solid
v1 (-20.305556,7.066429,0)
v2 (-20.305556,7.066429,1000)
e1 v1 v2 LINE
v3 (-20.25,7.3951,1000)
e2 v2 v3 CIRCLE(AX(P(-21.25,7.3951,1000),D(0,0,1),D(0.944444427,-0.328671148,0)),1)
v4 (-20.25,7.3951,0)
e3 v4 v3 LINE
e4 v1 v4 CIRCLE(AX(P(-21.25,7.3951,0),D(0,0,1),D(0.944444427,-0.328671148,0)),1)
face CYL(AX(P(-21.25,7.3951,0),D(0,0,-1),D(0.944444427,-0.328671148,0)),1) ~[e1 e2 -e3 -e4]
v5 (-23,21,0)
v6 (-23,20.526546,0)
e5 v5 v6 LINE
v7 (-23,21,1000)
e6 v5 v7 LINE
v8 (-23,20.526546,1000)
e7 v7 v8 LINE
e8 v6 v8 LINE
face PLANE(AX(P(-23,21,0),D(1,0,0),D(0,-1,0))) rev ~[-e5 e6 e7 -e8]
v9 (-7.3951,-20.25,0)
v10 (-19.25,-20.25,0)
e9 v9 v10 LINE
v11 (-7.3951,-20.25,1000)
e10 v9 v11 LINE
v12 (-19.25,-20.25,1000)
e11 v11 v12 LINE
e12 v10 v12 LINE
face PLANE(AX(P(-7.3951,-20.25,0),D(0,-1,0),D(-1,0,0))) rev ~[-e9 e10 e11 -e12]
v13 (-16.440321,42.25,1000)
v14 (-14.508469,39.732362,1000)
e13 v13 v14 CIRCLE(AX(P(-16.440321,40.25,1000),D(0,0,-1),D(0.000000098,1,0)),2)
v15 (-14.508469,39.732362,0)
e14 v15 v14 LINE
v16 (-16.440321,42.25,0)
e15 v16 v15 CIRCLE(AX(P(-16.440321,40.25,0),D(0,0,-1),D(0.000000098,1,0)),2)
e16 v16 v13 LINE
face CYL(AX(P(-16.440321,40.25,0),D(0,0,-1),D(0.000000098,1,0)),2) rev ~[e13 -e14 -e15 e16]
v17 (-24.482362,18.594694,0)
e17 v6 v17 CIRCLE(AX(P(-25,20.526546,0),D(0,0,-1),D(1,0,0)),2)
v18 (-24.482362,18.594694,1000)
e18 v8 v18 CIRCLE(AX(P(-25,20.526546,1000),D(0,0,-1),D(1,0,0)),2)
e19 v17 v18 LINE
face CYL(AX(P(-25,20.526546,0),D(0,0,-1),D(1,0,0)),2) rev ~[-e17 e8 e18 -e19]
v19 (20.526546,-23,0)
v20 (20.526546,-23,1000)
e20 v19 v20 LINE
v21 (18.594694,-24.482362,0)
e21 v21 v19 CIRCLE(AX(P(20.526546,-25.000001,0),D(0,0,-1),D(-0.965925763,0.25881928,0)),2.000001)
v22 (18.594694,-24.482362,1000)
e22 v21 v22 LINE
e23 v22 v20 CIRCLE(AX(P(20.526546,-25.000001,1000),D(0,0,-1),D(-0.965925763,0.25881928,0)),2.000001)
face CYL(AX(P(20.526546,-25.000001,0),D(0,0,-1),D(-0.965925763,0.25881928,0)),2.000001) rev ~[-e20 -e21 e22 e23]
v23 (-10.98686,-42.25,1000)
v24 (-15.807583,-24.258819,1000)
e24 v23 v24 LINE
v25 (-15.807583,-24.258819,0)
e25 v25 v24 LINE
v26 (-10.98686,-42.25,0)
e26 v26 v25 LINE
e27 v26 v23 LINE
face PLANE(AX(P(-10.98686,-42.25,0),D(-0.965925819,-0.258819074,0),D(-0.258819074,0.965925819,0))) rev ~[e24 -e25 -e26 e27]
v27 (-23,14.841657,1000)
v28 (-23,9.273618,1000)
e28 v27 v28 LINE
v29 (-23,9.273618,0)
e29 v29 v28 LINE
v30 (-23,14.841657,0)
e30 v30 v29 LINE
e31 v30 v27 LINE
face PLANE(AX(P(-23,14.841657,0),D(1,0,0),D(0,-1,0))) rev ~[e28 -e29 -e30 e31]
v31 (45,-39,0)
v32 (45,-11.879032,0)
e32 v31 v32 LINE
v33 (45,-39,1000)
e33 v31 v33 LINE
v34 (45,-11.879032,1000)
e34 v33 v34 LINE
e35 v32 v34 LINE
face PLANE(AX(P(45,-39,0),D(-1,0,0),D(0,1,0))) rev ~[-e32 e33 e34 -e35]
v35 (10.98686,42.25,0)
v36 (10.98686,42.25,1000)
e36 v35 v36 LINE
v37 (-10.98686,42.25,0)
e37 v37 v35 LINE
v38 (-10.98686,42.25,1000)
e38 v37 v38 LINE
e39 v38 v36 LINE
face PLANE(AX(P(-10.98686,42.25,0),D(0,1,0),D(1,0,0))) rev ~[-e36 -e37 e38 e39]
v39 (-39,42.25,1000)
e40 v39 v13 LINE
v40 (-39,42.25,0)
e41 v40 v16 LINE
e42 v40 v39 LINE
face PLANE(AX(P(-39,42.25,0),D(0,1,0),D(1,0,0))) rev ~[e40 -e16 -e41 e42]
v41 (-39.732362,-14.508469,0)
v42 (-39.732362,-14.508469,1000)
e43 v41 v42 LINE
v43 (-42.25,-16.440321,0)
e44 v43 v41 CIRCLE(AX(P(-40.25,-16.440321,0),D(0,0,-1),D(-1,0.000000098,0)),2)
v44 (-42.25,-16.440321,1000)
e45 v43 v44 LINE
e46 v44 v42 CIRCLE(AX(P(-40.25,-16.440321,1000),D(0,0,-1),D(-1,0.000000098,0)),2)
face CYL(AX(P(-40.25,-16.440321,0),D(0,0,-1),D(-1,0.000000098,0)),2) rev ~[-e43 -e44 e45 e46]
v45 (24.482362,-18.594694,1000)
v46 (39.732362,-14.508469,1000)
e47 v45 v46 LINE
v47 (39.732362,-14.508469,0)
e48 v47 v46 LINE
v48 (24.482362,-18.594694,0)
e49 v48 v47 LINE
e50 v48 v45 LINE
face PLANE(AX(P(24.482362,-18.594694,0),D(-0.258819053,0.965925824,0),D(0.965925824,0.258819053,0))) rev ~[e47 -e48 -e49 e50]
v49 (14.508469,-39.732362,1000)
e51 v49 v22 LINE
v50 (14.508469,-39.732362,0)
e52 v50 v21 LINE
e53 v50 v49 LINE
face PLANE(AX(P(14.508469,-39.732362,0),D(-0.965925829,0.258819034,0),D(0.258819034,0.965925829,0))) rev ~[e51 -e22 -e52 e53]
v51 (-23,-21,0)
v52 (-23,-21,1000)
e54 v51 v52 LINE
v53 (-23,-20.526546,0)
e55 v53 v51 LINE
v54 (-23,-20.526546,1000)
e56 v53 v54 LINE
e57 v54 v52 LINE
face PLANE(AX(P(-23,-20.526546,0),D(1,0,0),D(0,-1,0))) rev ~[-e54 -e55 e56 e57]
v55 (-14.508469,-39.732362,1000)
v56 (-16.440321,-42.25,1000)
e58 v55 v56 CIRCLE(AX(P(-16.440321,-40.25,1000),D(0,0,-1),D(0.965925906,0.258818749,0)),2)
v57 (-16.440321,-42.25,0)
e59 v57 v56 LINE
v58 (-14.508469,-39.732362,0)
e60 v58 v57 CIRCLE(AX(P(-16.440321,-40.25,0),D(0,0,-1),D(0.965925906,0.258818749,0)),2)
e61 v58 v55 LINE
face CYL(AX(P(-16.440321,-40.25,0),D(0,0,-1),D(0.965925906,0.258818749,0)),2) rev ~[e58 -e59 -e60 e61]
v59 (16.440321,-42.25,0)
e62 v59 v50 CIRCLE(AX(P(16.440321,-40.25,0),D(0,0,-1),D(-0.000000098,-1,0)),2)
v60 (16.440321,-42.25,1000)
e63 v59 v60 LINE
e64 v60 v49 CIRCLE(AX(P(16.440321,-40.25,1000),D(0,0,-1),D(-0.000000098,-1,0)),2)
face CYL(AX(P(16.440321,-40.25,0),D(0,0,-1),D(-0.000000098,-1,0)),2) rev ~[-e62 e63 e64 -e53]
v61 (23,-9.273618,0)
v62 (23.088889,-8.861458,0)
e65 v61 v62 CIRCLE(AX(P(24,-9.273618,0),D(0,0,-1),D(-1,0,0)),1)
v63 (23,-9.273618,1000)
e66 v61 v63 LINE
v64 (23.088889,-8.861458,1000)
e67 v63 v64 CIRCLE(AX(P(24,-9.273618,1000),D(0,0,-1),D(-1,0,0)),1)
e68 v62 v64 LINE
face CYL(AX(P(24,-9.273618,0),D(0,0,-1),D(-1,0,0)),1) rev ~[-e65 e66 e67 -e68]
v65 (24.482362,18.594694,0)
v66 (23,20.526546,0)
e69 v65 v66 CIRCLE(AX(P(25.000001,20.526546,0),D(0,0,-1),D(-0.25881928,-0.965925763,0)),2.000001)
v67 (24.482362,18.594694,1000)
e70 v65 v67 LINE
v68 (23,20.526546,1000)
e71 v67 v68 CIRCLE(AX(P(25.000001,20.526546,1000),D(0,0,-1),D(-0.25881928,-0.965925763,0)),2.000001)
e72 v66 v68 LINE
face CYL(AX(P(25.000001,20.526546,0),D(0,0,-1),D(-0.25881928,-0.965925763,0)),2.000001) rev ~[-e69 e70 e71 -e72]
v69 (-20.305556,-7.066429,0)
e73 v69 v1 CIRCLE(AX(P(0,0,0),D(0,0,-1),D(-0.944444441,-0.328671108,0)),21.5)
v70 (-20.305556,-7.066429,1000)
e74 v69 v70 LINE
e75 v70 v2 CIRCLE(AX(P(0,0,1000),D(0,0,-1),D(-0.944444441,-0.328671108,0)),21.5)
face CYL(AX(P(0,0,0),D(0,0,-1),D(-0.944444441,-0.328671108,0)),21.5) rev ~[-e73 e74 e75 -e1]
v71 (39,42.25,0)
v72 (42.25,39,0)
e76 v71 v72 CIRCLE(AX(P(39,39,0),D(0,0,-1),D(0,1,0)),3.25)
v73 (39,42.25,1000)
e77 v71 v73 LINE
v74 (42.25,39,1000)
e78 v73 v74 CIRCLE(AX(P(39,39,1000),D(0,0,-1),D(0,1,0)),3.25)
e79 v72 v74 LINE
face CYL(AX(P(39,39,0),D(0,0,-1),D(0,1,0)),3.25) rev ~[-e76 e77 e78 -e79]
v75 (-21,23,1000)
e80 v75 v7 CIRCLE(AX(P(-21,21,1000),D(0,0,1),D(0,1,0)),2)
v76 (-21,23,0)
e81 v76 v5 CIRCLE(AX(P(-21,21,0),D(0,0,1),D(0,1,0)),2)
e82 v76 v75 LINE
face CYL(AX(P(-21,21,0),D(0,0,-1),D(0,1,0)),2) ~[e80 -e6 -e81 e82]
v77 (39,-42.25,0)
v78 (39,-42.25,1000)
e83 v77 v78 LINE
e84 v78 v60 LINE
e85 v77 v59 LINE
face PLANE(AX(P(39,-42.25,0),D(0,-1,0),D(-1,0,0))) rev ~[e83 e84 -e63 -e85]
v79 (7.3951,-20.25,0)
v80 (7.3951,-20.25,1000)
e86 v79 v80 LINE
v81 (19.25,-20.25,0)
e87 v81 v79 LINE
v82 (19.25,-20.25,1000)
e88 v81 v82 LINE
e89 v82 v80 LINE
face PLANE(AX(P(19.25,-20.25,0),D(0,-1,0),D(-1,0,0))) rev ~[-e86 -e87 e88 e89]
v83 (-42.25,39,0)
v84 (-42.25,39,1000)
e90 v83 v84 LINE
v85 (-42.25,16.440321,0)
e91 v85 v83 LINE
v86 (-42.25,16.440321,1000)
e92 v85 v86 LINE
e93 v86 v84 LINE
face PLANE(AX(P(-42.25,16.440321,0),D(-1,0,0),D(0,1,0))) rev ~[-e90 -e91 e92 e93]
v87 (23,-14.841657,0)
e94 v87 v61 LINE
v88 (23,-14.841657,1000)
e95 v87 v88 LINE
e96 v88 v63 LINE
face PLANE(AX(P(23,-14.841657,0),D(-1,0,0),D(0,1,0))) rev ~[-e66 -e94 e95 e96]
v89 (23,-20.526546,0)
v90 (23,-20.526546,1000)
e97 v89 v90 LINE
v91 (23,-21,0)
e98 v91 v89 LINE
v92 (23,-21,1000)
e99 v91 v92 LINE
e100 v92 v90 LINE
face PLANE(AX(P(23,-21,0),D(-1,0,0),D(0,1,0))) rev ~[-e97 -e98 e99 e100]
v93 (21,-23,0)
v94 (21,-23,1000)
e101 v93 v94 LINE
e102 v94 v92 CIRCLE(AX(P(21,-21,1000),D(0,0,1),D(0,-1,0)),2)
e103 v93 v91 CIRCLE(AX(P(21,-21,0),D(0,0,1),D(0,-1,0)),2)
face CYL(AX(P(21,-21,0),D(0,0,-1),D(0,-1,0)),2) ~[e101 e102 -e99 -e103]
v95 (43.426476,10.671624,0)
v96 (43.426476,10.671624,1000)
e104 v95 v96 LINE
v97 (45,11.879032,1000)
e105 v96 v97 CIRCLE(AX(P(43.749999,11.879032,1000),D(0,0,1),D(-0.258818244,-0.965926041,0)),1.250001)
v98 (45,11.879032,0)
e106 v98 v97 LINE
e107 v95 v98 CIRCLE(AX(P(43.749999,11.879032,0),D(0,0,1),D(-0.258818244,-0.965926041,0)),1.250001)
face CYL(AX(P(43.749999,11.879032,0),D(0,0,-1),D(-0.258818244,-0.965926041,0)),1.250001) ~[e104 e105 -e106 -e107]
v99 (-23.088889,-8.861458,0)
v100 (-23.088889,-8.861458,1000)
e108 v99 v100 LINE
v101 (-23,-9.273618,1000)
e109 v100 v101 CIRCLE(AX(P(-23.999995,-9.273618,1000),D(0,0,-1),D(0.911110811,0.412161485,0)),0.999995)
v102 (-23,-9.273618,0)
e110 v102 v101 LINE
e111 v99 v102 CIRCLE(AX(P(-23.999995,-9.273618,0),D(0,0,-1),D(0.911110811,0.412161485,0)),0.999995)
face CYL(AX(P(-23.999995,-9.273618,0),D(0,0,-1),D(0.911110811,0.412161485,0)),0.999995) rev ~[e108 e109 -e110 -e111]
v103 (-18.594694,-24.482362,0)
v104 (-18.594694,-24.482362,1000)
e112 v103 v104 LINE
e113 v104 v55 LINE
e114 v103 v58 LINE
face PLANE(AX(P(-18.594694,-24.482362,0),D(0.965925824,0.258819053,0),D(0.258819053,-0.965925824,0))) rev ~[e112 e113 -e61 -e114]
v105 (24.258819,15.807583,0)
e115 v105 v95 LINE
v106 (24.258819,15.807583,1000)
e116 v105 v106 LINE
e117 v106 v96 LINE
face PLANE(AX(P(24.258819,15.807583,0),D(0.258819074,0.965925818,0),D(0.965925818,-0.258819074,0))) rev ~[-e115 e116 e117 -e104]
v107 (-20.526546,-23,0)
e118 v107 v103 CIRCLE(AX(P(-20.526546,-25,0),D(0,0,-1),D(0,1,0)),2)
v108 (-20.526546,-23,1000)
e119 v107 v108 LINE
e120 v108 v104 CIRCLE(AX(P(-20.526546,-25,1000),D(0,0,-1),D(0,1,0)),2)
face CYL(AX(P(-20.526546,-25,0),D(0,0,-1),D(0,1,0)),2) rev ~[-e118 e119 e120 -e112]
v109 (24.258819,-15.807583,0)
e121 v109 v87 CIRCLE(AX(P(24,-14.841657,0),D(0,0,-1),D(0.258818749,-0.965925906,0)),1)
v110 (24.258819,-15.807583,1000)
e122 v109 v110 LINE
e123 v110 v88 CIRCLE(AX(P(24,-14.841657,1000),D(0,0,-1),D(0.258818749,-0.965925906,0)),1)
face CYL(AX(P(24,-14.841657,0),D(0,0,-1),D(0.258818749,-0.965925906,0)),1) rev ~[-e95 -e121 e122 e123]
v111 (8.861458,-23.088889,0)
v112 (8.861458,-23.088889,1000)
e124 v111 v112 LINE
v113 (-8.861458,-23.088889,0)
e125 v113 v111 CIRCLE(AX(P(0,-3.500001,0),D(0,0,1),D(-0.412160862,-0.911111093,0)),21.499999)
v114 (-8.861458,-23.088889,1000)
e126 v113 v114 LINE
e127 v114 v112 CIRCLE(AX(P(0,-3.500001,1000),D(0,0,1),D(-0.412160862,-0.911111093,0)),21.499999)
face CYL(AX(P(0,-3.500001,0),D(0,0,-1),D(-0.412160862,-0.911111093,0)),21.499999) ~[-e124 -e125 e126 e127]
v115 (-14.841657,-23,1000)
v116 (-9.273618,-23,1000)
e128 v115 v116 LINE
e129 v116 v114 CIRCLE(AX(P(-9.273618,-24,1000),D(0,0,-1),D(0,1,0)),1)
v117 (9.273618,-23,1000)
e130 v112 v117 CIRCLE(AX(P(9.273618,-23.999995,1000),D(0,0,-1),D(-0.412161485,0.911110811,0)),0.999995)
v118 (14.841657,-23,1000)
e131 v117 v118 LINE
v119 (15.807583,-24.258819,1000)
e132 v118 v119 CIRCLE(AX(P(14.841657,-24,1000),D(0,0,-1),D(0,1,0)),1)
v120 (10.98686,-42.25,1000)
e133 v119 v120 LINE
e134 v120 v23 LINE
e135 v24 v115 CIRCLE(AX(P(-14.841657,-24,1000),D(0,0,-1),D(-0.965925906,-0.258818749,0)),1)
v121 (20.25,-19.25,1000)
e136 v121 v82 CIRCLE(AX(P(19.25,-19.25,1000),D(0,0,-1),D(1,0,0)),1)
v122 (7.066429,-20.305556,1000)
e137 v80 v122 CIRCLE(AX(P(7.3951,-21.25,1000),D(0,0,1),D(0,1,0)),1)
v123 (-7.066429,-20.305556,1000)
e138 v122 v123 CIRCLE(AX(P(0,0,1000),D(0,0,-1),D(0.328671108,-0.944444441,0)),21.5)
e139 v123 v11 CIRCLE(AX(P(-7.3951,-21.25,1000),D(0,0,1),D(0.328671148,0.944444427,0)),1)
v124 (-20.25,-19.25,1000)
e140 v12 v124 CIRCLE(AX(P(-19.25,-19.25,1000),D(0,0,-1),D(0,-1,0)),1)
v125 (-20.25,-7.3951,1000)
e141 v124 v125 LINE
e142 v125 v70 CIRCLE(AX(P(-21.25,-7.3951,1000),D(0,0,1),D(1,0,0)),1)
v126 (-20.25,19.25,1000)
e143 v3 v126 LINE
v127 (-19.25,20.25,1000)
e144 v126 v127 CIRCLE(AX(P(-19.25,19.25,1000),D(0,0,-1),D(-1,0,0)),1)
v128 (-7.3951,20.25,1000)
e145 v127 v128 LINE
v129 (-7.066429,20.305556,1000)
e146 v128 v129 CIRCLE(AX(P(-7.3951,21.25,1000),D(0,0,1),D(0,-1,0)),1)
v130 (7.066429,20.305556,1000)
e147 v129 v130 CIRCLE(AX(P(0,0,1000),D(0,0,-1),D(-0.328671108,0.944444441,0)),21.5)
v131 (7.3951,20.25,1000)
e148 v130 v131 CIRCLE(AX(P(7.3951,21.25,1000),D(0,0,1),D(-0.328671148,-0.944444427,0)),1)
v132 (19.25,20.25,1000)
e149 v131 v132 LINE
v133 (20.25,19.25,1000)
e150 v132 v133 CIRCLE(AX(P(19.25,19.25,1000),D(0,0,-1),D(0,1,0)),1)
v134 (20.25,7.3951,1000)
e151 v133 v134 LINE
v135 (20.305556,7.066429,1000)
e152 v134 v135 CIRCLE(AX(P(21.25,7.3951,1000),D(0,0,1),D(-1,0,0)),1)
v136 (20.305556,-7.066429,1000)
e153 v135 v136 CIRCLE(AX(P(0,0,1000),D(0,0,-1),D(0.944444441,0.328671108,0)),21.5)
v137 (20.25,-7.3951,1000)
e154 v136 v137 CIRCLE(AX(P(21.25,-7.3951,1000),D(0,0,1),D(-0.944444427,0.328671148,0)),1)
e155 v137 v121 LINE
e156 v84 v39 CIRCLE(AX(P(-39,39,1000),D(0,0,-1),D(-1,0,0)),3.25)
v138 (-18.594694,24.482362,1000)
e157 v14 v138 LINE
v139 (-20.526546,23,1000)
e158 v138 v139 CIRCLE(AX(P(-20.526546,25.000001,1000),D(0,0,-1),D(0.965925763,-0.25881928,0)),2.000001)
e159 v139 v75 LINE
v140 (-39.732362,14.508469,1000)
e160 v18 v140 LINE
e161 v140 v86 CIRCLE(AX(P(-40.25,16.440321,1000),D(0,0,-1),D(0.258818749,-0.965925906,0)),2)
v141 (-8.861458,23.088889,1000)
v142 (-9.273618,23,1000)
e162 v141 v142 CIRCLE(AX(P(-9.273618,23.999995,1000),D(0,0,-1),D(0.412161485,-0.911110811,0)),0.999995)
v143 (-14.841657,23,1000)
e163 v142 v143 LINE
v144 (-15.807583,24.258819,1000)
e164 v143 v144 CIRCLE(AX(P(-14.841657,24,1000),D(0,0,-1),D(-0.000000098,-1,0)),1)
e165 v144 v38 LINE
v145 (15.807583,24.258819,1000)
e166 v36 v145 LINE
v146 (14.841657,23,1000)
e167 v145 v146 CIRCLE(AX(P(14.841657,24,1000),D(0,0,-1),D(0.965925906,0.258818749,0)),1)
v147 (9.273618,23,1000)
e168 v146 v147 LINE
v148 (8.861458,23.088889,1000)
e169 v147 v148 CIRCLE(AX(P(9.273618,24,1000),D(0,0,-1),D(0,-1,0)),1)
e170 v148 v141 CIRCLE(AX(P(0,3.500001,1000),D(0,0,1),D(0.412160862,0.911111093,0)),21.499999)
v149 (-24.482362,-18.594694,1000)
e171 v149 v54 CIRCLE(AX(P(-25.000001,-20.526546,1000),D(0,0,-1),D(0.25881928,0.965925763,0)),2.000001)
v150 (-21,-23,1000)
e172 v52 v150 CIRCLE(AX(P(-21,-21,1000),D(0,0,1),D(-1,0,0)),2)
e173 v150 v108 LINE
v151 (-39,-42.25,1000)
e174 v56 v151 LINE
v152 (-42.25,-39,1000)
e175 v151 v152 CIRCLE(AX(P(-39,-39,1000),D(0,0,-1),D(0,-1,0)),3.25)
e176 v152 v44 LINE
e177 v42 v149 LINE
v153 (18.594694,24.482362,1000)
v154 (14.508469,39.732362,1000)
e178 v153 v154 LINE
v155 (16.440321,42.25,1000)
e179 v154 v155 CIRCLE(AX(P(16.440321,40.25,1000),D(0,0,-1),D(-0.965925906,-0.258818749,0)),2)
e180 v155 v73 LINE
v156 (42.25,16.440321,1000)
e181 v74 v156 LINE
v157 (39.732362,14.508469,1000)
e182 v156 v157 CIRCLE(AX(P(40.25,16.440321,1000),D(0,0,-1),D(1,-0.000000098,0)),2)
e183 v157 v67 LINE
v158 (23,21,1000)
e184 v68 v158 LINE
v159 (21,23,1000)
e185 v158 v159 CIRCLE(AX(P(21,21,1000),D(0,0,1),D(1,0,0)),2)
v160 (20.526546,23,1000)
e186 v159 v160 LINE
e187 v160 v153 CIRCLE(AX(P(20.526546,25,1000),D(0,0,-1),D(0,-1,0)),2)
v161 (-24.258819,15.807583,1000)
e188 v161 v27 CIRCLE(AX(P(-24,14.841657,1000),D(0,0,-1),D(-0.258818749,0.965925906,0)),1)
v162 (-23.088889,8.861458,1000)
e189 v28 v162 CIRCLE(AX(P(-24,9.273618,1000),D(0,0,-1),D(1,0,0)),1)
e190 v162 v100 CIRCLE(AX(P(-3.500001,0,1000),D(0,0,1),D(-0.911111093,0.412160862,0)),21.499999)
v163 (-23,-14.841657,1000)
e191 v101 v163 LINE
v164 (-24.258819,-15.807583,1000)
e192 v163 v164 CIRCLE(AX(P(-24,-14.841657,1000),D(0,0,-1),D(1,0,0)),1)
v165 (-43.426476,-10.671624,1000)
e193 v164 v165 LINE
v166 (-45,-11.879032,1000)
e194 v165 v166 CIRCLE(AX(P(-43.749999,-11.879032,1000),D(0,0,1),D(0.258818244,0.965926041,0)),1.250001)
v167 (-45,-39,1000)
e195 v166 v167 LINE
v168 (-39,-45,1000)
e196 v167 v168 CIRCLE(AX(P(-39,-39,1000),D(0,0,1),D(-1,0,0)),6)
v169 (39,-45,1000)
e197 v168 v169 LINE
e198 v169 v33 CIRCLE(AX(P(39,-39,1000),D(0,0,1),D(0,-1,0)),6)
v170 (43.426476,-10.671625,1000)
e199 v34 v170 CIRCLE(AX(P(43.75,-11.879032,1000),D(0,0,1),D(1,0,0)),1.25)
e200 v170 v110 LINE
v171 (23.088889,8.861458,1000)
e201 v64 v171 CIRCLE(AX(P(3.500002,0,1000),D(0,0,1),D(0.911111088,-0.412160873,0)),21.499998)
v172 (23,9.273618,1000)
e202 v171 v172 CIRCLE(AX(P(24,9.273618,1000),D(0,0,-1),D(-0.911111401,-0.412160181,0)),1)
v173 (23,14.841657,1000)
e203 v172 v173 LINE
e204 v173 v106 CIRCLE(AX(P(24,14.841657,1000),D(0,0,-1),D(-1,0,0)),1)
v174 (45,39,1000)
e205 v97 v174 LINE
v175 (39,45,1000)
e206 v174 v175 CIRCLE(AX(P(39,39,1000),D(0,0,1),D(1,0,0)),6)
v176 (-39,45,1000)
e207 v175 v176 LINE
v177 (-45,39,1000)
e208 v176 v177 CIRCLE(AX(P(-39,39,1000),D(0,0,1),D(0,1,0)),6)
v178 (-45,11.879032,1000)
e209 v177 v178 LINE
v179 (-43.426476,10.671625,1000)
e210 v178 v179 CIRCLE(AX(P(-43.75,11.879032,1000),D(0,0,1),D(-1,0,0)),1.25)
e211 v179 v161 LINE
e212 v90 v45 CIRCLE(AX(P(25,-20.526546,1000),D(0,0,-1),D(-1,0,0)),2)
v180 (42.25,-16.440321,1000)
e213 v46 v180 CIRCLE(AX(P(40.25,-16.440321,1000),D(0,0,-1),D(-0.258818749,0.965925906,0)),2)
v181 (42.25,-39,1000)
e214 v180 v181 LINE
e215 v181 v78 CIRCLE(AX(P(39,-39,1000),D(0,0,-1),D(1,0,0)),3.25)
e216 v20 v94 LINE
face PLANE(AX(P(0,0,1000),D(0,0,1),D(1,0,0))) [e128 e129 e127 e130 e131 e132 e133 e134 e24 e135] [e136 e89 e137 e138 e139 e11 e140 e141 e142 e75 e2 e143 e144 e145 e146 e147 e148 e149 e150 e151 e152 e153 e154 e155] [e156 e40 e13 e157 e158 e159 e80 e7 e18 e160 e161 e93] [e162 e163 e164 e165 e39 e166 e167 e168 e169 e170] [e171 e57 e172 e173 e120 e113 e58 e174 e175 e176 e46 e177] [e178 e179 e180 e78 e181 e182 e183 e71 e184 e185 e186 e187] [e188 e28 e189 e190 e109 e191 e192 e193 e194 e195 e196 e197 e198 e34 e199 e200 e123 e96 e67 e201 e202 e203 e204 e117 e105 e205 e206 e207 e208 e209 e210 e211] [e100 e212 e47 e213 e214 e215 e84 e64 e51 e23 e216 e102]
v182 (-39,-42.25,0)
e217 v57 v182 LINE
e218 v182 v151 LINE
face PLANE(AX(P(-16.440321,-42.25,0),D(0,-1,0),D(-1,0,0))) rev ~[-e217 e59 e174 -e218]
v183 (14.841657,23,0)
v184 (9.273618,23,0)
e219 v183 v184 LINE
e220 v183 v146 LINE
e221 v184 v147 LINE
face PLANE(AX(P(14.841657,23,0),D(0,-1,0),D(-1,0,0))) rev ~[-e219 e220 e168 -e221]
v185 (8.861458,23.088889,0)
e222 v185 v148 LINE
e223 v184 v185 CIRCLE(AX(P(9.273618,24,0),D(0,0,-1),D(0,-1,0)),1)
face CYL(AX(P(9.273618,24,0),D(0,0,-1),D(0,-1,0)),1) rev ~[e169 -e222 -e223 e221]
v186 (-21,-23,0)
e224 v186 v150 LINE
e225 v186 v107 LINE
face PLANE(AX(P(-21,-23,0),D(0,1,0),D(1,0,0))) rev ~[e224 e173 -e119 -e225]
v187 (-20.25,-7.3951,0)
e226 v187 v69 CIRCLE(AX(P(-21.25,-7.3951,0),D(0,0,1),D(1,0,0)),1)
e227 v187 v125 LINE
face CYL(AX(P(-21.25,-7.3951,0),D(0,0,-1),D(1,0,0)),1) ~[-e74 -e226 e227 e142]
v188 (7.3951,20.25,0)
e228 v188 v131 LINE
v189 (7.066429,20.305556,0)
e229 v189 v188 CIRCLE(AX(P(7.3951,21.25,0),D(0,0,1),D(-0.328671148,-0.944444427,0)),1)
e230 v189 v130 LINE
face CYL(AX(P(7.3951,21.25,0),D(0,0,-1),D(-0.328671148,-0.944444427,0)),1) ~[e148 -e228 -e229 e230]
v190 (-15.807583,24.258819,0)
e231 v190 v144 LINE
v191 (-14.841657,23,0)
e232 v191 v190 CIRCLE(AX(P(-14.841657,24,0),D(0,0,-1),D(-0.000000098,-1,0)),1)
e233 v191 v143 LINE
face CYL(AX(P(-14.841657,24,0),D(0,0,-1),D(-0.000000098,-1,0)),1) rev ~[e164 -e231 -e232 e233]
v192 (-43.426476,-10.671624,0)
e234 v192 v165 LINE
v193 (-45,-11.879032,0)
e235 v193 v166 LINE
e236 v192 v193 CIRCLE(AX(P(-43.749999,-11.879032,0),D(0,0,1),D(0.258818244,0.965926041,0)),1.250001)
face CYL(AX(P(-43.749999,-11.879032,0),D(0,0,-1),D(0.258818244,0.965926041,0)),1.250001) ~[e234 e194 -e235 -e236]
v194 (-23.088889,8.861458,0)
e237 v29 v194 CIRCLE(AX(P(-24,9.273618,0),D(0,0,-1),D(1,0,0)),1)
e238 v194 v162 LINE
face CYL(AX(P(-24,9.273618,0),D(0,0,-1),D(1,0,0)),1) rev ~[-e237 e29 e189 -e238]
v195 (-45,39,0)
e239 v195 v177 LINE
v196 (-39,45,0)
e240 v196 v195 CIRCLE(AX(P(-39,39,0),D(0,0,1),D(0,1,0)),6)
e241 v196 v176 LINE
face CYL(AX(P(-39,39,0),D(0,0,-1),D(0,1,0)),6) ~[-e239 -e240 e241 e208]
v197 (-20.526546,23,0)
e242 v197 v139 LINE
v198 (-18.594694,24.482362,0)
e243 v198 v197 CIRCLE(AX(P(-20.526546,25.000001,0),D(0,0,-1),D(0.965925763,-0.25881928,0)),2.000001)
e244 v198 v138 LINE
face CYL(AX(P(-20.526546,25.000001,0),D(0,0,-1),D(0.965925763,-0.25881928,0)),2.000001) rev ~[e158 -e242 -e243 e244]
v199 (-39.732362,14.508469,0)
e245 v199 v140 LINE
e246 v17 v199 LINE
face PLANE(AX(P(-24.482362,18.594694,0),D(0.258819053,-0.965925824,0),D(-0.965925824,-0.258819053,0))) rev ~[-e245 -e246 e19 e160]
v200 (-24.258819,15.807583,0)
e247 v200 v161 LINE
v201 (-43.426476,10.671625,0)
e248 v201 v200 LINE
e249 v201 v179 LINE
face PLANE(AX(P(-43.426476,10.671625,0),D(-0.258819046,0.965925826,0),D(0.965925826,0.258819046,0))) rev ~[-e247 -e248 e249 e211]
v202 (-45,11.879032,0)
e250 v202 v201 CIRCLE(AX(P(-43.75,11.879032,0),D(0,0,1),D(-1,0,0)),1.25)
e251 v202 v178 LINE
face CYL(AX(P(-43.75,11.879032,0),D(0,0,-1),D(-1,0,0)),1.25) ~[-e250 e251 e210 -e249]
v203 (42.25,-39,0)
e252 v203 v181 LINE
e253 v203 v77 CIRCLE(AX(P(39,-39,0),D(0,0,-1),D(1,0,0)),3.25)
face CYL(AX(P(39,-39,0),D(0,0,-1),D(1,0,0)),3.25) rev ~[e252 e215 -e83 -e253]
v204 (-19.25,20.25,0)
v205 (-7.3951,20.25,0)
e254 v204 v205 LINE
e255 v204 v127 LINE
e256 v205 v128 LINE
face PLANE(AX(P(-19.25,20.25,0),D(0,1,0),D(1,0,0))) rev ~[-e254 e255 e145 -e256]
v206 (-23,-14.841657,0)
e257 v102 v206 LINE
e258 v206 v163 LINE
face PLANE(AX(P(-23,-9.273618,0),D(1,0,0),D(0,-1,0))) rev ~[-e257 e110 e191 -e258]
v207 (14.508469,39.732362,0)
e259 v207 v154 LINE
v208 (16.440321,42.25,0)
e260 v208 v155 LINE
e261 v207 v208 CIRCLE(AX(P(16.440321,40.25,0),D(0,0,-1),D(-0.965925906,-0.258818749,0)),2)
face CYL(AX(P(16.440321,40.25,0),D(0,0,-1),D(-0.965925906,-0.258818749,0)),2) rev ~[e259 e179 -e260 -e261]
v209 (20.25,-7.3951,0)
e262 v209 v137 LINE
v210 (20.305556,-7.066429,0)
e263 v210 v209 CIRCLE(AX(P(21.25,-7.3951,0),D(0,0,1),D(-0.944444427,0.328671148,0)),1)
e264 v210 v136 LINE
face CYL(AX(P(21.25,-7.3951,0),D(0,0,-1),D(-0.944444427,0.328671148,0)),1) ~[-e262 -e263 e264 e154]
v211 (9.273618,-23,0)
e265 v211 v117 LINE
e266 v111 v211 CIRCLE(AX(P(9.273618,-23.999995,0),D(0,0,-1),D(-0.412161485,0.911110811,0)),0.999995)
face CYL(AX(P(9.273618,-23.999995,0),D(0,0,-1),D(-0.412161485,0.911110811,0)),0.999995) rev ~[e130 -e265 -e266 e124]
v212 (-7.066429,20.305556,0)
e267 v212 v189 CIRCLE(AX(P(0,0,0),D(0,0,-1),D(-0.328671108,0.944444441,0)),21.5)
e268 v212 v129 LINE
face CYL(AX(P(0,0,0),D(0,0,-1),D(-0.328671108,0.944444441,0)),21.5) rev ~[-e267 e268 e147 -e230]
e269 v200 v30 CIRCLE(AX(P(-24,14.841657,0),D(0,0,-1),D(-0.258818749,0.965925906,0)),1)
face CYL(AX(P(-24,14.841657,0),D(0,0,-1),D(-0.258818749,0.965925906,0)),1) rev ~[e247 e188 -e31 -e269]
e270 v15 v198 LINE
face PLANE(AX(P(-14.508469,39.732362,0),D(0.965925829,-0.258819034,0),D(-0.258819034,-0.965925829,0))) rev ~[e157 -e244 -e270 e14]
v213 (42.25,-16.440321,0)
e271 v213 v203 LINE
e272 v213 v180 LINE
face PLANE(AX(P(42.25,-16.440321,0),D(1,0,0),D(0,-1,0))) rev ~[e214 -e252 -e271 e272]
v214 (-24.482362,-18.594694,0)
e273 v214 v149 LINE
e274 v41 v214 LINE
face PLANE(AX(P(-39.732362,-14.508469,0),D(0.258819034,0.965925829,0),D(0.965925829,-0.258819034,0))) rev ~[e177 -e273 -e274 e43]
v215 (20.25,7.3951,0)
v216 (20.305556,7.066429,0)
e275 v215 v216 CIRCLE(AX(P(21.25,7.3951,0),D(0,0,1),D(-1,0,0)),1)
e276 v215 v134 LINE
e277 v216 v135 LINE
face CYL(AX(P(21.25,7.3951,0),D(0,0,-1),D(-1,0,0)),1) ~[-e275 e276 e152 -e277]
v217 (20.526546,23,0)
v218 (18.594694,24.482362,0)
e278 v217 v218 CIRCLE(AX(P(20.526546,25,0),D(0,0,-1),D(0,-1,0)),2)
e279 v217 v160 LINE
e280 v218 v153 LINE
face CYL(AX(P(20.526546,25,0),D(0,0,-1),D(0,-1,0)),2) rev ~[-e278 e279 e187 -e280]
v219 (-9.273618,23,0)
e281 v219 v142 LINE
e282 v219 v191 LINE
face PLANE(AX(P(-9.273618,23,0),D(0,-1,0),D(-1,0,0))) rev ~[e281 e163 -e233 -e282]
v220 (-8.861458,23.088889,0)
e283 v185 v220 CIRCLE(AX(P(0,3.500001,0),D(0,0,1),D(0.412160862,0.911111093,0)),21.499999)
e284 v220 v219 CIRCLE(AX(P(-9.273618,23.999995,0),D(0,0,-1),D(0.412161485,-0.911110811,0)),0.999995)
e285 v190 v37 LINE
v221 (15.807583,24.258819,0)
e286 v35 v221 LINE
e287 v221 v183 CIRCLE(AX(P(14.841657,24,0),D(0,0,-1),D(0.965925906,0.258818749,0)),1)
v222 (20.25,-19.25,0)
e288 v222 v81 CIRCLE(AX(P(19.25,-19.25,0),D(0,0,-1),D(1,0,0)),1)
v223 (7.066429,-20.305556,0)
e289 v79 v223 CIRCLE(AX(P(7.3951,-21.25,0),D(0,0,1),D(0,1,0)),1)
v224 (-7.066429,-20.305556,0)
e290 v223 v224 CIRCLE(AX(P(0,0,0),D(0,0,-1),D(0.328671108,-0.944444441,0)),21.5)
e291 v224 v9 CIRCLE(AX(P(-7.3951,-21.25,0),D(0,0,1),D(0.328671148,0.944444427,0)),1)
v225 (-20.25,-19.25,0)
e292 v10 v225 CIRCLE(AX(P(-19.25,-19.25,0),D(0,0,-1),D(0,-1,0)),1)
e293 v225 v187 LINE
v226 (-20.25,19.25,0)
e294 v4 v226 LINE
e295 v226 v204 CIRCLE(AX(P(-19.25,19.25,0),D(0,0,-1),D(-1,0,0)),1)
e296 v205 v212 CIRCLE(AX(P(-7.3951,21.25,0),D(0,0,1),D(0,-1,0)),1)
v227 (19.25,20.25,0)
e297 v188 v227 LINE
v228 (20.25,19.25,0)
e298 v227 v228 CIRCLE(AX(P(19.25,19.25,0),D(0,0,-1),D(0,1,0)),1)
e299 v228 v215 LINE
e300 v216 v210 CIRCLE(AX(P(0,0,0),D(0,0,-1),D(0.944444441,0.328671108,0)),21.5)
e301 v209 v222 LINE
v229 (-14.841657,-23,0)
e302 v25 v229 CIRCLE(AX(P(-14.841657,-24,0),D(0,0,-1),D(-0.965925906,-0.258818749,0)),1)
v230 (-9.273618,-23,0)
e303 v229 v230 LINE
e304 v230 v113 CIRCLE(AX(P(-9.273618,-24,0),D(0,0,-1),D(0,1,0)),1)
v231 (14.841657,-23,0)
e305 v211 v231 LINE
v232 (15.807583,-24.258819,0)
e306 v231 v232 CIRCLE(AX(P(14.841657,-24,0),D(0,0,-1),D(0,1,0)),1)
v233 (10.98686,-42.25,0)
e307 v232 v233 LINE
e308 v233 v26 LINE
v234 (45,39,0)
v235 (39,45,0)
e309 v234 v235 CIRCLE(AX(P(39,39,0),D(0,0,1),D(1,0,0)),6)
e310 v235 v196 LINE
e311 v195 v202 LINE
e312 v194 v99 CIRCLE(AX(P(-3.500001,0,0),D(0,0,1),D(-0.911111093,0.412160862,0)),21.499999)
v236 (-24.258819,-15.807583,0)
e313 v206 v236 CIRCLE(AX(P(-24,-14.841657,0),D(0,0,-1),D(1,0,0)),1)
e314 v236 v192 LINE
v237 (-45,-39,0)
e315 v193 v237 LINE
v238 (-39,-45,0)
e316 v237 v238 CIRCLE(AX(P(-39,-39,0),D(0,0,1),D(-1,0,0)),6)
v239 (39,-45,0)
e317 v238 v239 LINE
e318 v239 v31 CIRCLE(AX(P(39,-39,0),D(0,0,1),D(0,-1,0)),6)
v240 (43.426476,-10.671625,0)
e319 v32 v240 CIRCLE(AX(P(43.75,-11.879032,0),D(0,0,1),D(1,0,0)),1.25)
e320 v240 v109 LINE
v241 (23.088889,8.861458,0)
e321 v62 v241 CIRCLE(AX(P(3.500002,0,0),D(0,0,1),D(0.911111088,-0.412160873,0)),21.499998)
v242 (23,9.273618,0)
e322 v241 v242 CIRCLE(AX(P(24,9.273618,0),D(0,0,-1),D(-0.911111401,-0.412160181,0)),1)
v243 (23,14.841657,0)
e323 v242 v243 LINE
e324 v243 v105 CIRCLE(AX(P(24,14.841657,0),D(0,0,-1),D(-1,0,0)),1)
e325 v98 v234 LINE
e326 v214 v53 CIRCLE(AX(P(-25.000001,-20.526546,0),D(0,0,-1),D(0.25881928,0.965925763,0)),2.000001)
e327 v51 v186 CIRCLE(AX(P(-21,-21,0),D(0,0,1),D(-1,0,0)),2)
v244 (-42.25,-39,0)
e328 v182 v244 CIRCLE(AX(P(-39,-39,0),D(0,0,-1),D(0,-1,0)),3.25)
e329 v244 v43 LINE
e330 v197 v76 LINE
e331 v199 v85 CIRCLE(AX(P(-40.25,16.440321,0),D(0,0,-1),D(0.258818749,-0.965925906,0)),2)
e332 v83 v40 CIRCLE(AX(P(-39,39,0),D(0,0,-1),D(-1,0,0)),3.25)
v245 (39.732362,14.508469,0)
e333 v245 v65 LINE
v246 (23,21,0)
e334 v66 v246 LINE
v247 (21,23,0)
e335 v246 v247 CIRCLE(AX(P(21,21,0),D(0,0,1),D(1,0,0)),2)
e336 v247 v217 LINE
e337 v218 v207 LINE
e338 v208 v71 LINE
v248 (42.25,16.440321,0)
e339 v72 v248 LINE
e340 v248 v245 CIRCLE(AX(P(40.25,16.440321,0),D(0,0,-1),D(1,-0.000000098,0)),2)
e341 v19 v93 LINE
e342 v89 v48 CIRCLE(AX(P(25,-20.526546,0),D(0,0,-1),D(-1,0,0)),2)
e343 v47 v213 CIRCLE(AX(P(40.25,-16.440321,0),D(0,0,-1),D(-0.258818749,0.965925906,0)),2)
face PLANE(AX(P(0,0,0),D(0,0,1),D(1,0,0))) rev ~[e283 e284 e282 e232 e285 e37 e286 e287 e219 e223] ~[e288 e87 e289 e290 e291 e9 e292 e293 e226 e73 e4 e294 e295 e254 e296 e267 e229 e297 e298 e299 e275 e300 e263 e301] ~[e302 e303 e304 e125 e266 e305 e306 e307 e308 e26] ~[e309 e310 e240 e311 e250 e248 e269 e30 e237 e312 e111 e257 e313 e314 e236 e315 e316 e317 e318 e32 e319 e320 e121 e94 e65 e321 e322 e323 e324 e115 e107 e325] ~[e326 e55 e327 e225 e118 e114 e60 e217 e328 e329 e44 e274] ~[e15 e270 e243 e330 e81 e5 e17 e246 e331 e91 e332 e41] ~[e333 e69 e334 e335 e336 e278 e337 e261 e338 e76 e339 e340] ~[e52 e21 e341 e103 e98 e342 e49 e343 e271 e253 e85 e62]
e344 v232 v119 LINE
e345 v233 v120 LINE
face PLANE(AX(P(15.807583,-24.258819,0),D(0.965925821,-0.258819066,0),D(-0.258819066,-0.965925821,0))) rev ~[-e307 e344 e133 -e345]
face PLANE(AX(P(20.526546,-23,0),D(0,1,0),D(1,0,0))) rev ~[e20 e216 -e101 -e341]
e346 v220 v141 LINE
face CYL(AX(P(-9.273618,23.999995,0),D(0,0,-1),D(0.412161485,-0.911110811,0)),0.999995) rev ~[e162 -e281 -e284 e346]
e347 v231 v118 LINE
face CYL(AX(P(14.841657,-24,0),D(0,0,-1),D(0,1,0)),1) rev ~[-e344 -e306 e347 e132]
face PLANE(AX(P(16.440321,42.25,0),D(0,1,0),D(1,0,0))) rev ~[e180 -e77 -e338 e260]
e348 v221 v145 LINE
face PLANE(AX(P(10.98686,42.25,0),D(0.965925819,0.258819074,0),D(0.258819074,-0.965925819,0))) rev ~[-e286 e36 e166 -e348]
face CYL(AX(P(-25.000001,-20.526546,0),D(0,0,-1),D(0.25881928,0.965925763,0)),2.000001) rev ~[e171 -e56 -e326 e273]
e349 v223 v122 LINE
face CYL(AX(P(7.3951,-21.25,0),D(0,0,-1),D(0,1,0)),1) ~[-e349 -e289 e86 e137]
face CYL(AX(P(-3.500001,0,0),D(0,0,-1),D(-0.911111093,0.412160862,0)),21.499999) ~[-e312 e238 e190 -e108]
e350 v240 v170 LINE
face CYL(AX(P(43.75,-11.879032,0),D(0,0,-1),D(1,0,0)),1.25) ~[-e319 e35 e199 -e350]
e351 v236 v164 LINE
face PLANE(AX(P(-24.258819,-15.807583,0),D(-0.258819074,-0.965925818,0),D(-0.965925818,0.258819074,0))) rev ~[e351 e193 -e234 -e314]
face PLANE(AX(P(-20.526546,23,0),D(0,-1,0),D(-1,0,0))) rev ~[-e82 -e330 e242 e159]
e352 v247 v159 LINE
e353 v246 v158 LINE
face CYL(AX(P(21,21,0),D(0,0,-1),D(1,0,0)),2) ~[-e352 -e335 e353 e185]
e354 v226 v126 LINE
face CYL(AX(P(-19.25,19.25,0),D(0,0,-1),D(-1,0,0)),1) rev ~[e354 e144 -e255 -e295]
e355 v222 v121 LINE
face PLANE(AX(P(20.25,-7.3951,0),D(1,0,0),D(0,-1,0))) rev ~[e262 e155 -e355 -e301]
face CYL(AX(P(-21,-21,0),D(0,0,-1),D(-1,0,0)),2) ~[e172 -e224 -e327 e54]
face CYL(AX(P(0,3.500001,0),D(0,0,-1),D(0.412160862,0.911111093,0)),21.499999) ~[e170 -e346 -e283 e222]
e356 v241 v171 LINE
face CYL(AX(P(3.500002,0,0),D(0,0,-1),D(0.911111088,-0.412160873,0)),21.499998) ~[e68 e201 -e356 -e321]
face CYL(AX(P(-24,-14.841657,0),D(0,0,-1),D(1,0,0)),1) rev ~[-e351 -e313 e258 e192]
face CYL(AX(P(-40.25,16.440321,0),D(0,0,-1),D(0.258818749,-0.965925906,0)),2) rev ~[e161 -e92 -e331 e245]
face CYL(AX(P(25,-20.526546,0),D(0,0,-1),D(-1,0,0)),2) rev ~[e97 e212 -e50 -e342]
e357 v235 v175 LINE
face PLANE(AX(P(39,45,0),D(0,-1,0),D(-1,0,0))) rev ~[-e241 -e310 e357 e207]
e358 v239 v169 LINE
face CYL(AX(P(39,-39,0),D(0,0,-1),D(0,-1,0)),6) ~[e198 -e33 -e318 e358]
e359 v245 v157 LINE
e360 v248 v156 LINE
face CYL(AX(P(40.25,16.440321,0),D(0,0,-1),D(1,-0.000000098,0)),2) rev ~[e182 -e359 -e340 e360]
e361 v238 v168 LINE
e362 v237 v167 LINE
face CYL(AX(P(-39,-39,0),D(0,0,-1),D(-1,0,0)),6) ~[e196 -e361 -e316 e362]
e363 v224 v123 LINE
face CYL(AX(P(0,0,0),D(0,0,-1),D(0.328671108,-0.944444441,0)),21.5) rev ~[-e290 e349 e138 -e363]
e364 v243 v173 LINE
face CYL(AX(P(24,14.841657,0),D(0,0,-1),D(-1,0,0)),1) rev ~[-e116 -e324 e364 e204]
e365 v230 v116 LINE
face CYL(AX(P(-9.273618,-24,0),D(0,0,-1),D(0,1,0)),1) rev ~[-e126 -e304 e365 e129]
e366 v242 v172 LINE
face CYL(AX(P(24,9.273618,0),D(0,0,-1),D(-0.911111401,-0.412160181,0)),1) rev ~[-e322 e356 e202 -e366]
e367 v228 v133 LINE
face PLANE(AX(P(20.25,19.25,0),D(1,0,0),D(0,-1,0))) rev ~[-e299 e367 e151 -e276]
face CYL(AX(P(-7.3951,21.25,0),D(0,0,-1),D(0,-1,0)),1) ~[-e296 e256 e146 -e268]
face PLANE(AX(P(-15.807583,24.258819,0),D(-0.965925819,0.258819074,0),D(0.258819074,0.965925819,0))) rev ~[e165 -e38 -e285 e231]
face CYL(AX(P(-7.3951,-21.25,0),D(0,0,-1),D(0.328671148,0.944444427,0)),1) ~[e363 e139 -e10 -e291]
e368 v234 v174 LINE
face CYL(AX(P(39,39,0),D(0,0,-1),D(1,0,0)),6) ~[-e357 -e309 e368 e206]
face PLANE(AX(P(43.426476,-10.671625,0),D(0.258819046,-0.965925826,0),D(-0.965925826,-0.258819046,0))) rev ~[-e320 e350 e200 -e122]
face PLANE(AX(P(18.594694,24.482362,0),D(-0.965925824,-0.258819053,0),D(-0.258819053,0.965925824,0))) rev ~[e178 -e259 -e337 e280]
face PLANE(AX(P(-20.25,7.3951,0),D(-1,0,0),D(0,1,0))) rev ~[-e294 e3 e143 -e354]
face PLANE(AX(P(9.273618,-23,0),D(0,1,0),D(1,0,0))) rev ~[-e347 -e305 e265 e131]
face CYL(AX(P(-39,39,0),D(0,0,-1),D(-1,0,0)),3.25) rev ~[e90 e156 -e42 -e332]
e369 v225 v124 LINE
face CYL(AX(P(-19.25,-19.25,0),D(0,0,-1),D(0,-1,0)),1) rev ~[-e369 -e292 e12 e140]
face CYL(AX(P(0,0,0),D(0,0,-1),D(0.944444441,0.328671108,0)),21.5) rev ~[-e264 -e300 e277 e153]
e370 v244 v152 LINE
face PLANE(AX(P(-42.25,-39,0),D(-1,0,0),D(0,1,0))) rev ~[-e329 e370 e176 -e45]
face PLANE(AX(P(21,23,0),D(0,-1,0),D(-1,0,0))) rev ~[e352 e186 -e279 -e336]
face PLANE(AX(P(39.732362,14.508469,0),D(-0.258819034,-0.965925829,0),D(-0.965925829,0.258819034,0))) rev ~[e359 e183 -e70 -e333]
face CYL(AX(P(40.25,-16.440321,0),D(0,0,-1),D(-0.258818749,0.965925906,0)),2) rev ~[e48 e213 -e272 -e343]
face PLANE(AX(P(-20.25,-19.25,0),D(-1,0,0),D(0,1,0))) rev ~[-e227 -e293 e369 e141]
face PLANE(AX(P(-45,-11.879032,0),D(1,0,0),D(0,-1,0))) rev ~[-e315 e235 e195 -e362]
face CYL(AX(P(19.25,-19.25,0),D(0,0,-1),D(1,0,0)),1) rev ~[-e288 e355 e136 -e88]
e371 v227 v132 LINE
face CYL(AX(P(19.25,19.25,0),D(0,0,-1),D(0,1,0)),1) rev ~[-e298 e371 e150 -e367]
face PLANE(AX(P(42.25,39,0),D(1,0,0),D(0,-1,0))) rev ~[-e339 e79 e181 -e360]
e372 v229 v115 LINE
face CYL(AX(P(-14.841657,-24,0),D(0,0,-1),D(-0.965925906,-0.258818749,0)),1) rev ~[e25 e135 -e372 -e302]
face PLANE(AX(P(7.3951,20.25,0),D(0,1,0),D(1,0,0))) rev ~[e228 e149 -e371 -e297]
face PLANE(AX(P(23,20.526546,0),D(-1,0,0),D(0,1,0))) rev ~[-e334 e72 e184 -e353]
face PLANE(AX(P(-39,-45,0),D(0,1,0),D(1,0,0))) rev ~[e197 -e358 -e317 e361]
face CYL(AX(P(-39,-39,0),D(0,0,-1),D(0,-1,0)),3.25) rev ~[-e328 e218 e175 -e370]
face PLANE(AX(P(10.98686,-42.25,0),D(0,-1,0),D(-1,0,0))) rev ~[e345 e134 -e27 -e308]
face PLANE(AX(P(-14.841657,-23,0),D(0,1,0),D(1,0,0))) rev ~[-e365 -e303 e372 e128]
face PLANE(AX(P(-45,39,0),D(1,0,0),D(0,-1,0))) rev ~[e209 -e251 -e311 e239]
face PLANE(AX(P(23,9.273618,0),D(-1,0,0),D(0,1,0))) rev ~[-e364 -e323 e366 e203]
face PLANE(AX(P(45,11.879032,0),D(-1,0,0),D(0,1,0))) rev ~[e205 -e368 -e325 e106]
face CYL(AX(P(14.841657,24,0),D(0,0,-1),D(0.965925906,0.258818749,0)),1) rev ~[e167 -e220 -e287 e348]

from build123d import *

# Parameters (mm, degrees)
F1_DEPTH = 1000


# Not quite as in the source:
# - ends of sketch curves that miss each other by under 0.0002 mm in the source are joined


with BuildPart() as f1:
    # F0 (on Top) → F1 (new body)
    with BuildSketch(Plane.XY):
        with BuildLine():
            ThreePointArc((23.0888885991, 8.8614578186), (23.022474706, 9.062799833), (23, 9.273618))
            Line((23, 9.273618), (23, 14.841657))
            ThreePointArc((23, 14.841657), (23.3912385359, 15.6350103133), (24.2588189596, 15.8075828492))
            Line((24.2588189596, 15.8075828492), (43.426476, 10.671624))
            ThreePointArc((43.426476, 10.671624), (44.5109517857, 10.8873403242), (45, 11.879032))
            Line((45, 11.879032), (45, 39))
            ThreePointArc((45, 39), (43.2426406871, 43.2426406871), (39, 45))
            Line((39, 45), (-39, 45))
            ThreePointArc((-39, 45), (-43.2426406871, 43.2426406871), (-45, 39))
            Line((-45, 39), (-45, 11.879032))
            ThreePointArc((-45, 11.879032), (-44.5109517857, 10.8873403242), (-43.4264761923, 10.6716247175))
            Line((-43.4264761923, 10.6716247175), (-24.258819, 15.807583))
            ThreePointArc((-24.258819, 15.807583), (-23.3912385359, 15.6350103133), (-23, 14.841657))
            Line((-23, 14.841657), (-23, 9.273618))
            ThreePointArc((-23, 9.273618), (-23.022474706, 9.062799833), (-23.0888885991, 8.8614578186))
            ThreePointArc((-23.0888885991, 8.8614578186), (-25, 0), (-23.0888887851, -8.8614579028))
            ThreePointArc((-23.0888887851, -8.8614579028), (-23.022474706, -9.062799833), (-23, -9.273618))
            Line((-23, -9.273618), (-23, -14.841657))
            ThreePointArc((-23, -14.841657), (-23.3912385359, -15.6350103133), (-24.2588189596, -15.8075828492))
            Line((-24.2588189596, -15.8075828492), (-43.426476, -10.671624))
            ThreePointArc((-43.426476, -10.671624), (-44.5109517857, -10.8873403242), (-45, -11.879032))
            Line((-45, -11.879032), (-45, -39))
            ThreePointArc((-45, -39), (-43.2426406871, -43.2426406871), (-39, -45))
            Line((-39, -45), (39, -45))
            ThreePointArc((39, -45), (43.2426406871, -43.2426406871), (45, -39))
            Line((45, -39), (45, -11.879032))
            ThreePointArc((45, -11.879032), (44.5109517857, -10.8873403242), (43.4264761923, -10.6716247175))
            Line((43.4264761923, -10.6716247175), (24.258819, -15.807583))
            ThreePointArc((24.258819, -15.807583), (23.3912385359, -15.6350103133), (23, -14.841657))
            Line((23, -14.841657), (23, -9.273618))
            ThreePointArc((23, -9.273618), (23.022474706, -9.062799833), (23.0888885991, -8.8614578186))
            ThreePointArc((23.0888885991, -8.8614578186), (25, 0), (23.0888885991, 8.8614578186))
        make_face()
        with BuildLine():
            Line((-14.841657, -23), (-9.273618, -23))
            ThreePointArc((-9.273618, -23), (-9.062799833, -23.022474706), (-8.8614578186, -23.0888885991))
            ThreePointArc((-8.8614578186, -23.0888885991), (0, -25), (8.8614579028, -23.0888887851))
            ThreePointArc((8.8614579028, -23.0888887851), (9.062799833, -23.022474706), (9.273618, -23))
            Line((9.273618, -23), (14.841657, -23))
            ThreePointArc((14.841657, -23), (15.6350103133, -23.3912385359), (15.8075828492, -24.2588189596))
            Line((15.8075828492, -24.2588189596), (10.98686, -42.25))
            Line((10.98686, -42.25), (-10.98686, -42.25))
            Line((-10.98686, -42.25), (-15.807583, -24.258819))
            ThreePointArc((-15.807583, -24.258819), (-15.6350103133, -23.3912385359), (-14.841657, -23))
        make_face(mode=Mode.SUBTRACT)
        with BuildLine():
            Line((-39.732362, -14.508469), (-24.482362, -18.594694))
            ThreePointArc((-24.482362, -18.594694), (-23.4132933733, -19.3090230718), (-23, -20.526546))
            Line((-23, -20.526546), (-23, -21))
            ThreePointArc((-23, -21), (-22.4142135624, -22.4142135624), (-21, -23))
            Line((-21, -23), (-20.526546, -23))
            ThreePointArc((-20.526546, -23), (-19.3090230718, -23.4132933733), (-18.5946943016, -24.4823620808))
            Line((-18.5946943016, -24.4823620808), (-14.508469, -39.732362))
            ThreePointArc((-14.508469, -39.732362), (-14.8536143733, -41.4675229282), (-16.440321, -42.25))
            Line((-16.440321, -42.25), (-39, -42.25))
            ThreePointArc((-39, -42.25), (-41.2980970389, -41.2980970389), (-42.25, -39))
            Line((-42.25, -39), (-42.25, -16.440321))
            ThreePointArc((-42.25, -16.440321), (-41.4675229282, -14.8536143733), (-39.732362, -14.508469))
        make_face(mode=Mode.SUBTRACT)
        with BuildLine():
            Line((14.508469, -39.732362), (18.594694, -24.482362))
            ThreePointArc((18.594694, -24.482362), (19.3090230718, -23.4132933733), (20.526546, -23))
            Line((20.526546, -23), (21, -23))
            ThreePointArc((21, -23), (22.4142135624, -22.4142135624), (23, -21))
            Line((23, -21), (23, -20.526546))
            ThreePointArc((23, -20.526546), (23.4132933733, -19.3090230718), (24.4823620808, -18.5946943016))
            Line((24.4823620808, -18.5946943016), (39.732362, -14.508469))
            ThreePointArc((39.732362, -14.508469), (41.4675229282, -14.8536143733), (42.25, -16.440321))
            Line((42.25, -16.440321), (42.25, -39))
            ThreePointArc((42.25, -39), (41.2980970389, -41.2980970389), (39, -42.25))
            Line((39, -42.25), (16.440321, -42.25))
            ThreePointArc((16.440321, -42.25), (14.8536143733, -41.4675229282), (14.508469, -39.732362))
        make_face(mode=Mode.SUBTRACT)
        with BuildLine():
            Line((-7.3951, -20.25), (-19.25, -20.25))
            ThreePointArc((-19.25, -20.25), (-19.9571067812, -19.9571067812), (-20.25, -19.25))
            Line((-20.25, -19.25), (-20.25, -7.3951))
            ThreePointArc((-20.25, -7.3951), (-20.2639867072, -7.2284333074), (-20.3055555728, -7.0664288513))
            ThreePointArc((-20.3055554887, -7.066428822), (-21.5, 0), (-20.3055554887, 7.066428822))
            ThreePointArc((-20.3055555728, 7.0664288513), (-20.2639867072, 7.2284333074), (-20.25, 7.3951))
            Line((-20.25, 7.3951), (-20.25, 19.25))
            ThreePointArc((-20.25, 19.25), (-19.9571067812, 19.9571067812), (-19.25, 20.25))
            Line((-19.25, 20.25), (-7.3951, 20.25))
            ThreePointArc((-7.3951, 20.25), (-7.2284333074, 20.2639867072), (-7.0664288513, 20.3055555728))
            ThreePointArc((-7.066428822, 20.3055554887), (0, 21.5), (7.066428822, 20.3055554887))
            ThreePointArc((7.0664288513, 20.3055555728), (7.2284333074, 20.2639867072), (7.3951, 20.25))
            Line((7.3951, 20.25), (19.25, 20.25))
            ThreePointArc((19.25, 20.25), (19.9571067812, 19.9571067812), (20.25, 19.25))
            Line((20.25, 19.25), (20.25, 7.3951))
            ThreePointArc((20.25, 7.3951), (20.2639867072, 7.2284333074), (20.3055555728, 7.0664288513))
            ThreePointArc((20.3055554887, 7.066428822), (21.5, 0), (20.3055554887, -7.066428822))
            ThreePointArc((20.3055555728, -7.0664288513), (20.2639867072, -7.2284333074), (20.25, -7.3951))
            Line((20.25, -7.3951), (20.25, -19.25))
            ThreePointArc((20.25, -19.25), (19.9571067812, -19.9571067812), (19.25, -20.25))
            Line((19.25, -20.25), (7.3951, -20.25))
            ThreePointArc((7.3951, -20.25), (7.2284333074, -20.2639867072), (7.0664288513, -20.3055555728))
            ThreePointArc((7.066428822, -20.3055554887), (0, -21.5), (-7.066428822, -20.3055554887))
            ThreePointArc((-7.0664288513, -20.3055555728), (-7.2284333074, -20.2639867072), (-7.3951, -20.25))
        make_face(mode=Mode.SUBTRACT)
        with BuildLine():
            Line((-14.508469, 39.732362), (-18.594694, 24.482362))
            ThreePointArc((-18.594694, 24.482362), (-19.3090230718, 23.4132933733), (-20.526546, 23))
            Line((-20.526546, 23), (-21, 23))
            ThreePointArc((-21, 23), (-22.4142135624, 22.4142135624), (-23, 21))
            Line((-23, 21), (-23, 20.526546))
            ThreePointArc((-23, 20.526546), (-23.4132933733, 19.3090230718), (-24.4823620808, 18.5946943016))
            Line((-24.4823620808, 18.5946943016), (-39.732362, 14.508469))
            ThreePointArc((-39.732362, 14.508469), (-41.4675229282, 14.8536143733), (-42.25, 16.440321))
            Line((-42.25, 16.440321), (-42.25, 39))
            ThreePointArc((-42.25, 39), (-41.2980970389, 41.2980970389), (-39, 42.25))
            Line((-39, 42.25), (-16.440321, 42.25))
            ThreePointArc((-16.440321, 42.25), (-14.8536143733, 41.4675229282), (-14.508469, 39.732362))
        make_face(mode=Mode.SUBTRACT)
        with BuildLine():
            Line((-15.807583, 24.258819), (-10.98686, 42.25))
            Line((-10.98686, 42.25), (10.98686, 42.25))
            Line((10.98686, 42.25), (15.807583, 24.258819))
            ThreePointArc((15.807583, 24.258819), (15.6350103133, 23.3912385359), (14.841657, 23))
            Line((14.841657, 23), (9.273618, 23))
            ThreePointArc((9.273618, 23), (9.062799833, 23.022474706), (8.8614578186, 23.0888885991))
            ThreePointArc((8.8614578186, 23.0888885991), (0, 25), (-8.8614579028, 23.0888887851))
            ThreePointArc((-8.8614579028, 23.0888887851), (-9.062799833, 23.022474706), (-9.273618, 23))
            Line((-9.273618, 23), (-14.841657, 23))
            ThreePointArc((-14.841657, 23), (-15.6350103133, 23.3912385359), (-15.807583, 24.258819))
        make_face(mode=Mode.SUBTRACT)
        with BuildLine():
            Line((39.732362, 14.508469), (24.482362, 18.594694))
            ThreePointArc((24.482362, 18.594694), (23.4132933733, 19.3090230718), (23, 20.526546))
            Line((23, 20.526546), (23, 21))
            ThreePointArc((23, 21), (22.4142135624, 22.4142135624), (21, 23))
            Line((21, 23), (20.526546, 23))
            ThreePointArc((20.526546, 23), (19.3090230718, 23.4132933733), (18.5946943016, 24.4823620808))
            Line((18.5946943016, 24.4823620808), (14.508469, 39.732362))
            ThreePointArc((14.508469, 39.732362), (14.8536143733, 41.4675229282), (16.440321, 42.25))
            Line((16.440321, 42.25), (39, 42.25))
            ThreePointArc((39, 42.25), (41.2980970389, 41.2980970389), (42.25, 39))
            Line((42.25, 39), (42.25, 16.440321))
            ThreePointArc((42.25, 16.440321), (41.4675229282, 14.8536143733), (39.732362, 14.508469))
        make_face(mode=Mode.SUBTRACT)
    extrude(amount=F1_DEPTH)


solid = f1.part
